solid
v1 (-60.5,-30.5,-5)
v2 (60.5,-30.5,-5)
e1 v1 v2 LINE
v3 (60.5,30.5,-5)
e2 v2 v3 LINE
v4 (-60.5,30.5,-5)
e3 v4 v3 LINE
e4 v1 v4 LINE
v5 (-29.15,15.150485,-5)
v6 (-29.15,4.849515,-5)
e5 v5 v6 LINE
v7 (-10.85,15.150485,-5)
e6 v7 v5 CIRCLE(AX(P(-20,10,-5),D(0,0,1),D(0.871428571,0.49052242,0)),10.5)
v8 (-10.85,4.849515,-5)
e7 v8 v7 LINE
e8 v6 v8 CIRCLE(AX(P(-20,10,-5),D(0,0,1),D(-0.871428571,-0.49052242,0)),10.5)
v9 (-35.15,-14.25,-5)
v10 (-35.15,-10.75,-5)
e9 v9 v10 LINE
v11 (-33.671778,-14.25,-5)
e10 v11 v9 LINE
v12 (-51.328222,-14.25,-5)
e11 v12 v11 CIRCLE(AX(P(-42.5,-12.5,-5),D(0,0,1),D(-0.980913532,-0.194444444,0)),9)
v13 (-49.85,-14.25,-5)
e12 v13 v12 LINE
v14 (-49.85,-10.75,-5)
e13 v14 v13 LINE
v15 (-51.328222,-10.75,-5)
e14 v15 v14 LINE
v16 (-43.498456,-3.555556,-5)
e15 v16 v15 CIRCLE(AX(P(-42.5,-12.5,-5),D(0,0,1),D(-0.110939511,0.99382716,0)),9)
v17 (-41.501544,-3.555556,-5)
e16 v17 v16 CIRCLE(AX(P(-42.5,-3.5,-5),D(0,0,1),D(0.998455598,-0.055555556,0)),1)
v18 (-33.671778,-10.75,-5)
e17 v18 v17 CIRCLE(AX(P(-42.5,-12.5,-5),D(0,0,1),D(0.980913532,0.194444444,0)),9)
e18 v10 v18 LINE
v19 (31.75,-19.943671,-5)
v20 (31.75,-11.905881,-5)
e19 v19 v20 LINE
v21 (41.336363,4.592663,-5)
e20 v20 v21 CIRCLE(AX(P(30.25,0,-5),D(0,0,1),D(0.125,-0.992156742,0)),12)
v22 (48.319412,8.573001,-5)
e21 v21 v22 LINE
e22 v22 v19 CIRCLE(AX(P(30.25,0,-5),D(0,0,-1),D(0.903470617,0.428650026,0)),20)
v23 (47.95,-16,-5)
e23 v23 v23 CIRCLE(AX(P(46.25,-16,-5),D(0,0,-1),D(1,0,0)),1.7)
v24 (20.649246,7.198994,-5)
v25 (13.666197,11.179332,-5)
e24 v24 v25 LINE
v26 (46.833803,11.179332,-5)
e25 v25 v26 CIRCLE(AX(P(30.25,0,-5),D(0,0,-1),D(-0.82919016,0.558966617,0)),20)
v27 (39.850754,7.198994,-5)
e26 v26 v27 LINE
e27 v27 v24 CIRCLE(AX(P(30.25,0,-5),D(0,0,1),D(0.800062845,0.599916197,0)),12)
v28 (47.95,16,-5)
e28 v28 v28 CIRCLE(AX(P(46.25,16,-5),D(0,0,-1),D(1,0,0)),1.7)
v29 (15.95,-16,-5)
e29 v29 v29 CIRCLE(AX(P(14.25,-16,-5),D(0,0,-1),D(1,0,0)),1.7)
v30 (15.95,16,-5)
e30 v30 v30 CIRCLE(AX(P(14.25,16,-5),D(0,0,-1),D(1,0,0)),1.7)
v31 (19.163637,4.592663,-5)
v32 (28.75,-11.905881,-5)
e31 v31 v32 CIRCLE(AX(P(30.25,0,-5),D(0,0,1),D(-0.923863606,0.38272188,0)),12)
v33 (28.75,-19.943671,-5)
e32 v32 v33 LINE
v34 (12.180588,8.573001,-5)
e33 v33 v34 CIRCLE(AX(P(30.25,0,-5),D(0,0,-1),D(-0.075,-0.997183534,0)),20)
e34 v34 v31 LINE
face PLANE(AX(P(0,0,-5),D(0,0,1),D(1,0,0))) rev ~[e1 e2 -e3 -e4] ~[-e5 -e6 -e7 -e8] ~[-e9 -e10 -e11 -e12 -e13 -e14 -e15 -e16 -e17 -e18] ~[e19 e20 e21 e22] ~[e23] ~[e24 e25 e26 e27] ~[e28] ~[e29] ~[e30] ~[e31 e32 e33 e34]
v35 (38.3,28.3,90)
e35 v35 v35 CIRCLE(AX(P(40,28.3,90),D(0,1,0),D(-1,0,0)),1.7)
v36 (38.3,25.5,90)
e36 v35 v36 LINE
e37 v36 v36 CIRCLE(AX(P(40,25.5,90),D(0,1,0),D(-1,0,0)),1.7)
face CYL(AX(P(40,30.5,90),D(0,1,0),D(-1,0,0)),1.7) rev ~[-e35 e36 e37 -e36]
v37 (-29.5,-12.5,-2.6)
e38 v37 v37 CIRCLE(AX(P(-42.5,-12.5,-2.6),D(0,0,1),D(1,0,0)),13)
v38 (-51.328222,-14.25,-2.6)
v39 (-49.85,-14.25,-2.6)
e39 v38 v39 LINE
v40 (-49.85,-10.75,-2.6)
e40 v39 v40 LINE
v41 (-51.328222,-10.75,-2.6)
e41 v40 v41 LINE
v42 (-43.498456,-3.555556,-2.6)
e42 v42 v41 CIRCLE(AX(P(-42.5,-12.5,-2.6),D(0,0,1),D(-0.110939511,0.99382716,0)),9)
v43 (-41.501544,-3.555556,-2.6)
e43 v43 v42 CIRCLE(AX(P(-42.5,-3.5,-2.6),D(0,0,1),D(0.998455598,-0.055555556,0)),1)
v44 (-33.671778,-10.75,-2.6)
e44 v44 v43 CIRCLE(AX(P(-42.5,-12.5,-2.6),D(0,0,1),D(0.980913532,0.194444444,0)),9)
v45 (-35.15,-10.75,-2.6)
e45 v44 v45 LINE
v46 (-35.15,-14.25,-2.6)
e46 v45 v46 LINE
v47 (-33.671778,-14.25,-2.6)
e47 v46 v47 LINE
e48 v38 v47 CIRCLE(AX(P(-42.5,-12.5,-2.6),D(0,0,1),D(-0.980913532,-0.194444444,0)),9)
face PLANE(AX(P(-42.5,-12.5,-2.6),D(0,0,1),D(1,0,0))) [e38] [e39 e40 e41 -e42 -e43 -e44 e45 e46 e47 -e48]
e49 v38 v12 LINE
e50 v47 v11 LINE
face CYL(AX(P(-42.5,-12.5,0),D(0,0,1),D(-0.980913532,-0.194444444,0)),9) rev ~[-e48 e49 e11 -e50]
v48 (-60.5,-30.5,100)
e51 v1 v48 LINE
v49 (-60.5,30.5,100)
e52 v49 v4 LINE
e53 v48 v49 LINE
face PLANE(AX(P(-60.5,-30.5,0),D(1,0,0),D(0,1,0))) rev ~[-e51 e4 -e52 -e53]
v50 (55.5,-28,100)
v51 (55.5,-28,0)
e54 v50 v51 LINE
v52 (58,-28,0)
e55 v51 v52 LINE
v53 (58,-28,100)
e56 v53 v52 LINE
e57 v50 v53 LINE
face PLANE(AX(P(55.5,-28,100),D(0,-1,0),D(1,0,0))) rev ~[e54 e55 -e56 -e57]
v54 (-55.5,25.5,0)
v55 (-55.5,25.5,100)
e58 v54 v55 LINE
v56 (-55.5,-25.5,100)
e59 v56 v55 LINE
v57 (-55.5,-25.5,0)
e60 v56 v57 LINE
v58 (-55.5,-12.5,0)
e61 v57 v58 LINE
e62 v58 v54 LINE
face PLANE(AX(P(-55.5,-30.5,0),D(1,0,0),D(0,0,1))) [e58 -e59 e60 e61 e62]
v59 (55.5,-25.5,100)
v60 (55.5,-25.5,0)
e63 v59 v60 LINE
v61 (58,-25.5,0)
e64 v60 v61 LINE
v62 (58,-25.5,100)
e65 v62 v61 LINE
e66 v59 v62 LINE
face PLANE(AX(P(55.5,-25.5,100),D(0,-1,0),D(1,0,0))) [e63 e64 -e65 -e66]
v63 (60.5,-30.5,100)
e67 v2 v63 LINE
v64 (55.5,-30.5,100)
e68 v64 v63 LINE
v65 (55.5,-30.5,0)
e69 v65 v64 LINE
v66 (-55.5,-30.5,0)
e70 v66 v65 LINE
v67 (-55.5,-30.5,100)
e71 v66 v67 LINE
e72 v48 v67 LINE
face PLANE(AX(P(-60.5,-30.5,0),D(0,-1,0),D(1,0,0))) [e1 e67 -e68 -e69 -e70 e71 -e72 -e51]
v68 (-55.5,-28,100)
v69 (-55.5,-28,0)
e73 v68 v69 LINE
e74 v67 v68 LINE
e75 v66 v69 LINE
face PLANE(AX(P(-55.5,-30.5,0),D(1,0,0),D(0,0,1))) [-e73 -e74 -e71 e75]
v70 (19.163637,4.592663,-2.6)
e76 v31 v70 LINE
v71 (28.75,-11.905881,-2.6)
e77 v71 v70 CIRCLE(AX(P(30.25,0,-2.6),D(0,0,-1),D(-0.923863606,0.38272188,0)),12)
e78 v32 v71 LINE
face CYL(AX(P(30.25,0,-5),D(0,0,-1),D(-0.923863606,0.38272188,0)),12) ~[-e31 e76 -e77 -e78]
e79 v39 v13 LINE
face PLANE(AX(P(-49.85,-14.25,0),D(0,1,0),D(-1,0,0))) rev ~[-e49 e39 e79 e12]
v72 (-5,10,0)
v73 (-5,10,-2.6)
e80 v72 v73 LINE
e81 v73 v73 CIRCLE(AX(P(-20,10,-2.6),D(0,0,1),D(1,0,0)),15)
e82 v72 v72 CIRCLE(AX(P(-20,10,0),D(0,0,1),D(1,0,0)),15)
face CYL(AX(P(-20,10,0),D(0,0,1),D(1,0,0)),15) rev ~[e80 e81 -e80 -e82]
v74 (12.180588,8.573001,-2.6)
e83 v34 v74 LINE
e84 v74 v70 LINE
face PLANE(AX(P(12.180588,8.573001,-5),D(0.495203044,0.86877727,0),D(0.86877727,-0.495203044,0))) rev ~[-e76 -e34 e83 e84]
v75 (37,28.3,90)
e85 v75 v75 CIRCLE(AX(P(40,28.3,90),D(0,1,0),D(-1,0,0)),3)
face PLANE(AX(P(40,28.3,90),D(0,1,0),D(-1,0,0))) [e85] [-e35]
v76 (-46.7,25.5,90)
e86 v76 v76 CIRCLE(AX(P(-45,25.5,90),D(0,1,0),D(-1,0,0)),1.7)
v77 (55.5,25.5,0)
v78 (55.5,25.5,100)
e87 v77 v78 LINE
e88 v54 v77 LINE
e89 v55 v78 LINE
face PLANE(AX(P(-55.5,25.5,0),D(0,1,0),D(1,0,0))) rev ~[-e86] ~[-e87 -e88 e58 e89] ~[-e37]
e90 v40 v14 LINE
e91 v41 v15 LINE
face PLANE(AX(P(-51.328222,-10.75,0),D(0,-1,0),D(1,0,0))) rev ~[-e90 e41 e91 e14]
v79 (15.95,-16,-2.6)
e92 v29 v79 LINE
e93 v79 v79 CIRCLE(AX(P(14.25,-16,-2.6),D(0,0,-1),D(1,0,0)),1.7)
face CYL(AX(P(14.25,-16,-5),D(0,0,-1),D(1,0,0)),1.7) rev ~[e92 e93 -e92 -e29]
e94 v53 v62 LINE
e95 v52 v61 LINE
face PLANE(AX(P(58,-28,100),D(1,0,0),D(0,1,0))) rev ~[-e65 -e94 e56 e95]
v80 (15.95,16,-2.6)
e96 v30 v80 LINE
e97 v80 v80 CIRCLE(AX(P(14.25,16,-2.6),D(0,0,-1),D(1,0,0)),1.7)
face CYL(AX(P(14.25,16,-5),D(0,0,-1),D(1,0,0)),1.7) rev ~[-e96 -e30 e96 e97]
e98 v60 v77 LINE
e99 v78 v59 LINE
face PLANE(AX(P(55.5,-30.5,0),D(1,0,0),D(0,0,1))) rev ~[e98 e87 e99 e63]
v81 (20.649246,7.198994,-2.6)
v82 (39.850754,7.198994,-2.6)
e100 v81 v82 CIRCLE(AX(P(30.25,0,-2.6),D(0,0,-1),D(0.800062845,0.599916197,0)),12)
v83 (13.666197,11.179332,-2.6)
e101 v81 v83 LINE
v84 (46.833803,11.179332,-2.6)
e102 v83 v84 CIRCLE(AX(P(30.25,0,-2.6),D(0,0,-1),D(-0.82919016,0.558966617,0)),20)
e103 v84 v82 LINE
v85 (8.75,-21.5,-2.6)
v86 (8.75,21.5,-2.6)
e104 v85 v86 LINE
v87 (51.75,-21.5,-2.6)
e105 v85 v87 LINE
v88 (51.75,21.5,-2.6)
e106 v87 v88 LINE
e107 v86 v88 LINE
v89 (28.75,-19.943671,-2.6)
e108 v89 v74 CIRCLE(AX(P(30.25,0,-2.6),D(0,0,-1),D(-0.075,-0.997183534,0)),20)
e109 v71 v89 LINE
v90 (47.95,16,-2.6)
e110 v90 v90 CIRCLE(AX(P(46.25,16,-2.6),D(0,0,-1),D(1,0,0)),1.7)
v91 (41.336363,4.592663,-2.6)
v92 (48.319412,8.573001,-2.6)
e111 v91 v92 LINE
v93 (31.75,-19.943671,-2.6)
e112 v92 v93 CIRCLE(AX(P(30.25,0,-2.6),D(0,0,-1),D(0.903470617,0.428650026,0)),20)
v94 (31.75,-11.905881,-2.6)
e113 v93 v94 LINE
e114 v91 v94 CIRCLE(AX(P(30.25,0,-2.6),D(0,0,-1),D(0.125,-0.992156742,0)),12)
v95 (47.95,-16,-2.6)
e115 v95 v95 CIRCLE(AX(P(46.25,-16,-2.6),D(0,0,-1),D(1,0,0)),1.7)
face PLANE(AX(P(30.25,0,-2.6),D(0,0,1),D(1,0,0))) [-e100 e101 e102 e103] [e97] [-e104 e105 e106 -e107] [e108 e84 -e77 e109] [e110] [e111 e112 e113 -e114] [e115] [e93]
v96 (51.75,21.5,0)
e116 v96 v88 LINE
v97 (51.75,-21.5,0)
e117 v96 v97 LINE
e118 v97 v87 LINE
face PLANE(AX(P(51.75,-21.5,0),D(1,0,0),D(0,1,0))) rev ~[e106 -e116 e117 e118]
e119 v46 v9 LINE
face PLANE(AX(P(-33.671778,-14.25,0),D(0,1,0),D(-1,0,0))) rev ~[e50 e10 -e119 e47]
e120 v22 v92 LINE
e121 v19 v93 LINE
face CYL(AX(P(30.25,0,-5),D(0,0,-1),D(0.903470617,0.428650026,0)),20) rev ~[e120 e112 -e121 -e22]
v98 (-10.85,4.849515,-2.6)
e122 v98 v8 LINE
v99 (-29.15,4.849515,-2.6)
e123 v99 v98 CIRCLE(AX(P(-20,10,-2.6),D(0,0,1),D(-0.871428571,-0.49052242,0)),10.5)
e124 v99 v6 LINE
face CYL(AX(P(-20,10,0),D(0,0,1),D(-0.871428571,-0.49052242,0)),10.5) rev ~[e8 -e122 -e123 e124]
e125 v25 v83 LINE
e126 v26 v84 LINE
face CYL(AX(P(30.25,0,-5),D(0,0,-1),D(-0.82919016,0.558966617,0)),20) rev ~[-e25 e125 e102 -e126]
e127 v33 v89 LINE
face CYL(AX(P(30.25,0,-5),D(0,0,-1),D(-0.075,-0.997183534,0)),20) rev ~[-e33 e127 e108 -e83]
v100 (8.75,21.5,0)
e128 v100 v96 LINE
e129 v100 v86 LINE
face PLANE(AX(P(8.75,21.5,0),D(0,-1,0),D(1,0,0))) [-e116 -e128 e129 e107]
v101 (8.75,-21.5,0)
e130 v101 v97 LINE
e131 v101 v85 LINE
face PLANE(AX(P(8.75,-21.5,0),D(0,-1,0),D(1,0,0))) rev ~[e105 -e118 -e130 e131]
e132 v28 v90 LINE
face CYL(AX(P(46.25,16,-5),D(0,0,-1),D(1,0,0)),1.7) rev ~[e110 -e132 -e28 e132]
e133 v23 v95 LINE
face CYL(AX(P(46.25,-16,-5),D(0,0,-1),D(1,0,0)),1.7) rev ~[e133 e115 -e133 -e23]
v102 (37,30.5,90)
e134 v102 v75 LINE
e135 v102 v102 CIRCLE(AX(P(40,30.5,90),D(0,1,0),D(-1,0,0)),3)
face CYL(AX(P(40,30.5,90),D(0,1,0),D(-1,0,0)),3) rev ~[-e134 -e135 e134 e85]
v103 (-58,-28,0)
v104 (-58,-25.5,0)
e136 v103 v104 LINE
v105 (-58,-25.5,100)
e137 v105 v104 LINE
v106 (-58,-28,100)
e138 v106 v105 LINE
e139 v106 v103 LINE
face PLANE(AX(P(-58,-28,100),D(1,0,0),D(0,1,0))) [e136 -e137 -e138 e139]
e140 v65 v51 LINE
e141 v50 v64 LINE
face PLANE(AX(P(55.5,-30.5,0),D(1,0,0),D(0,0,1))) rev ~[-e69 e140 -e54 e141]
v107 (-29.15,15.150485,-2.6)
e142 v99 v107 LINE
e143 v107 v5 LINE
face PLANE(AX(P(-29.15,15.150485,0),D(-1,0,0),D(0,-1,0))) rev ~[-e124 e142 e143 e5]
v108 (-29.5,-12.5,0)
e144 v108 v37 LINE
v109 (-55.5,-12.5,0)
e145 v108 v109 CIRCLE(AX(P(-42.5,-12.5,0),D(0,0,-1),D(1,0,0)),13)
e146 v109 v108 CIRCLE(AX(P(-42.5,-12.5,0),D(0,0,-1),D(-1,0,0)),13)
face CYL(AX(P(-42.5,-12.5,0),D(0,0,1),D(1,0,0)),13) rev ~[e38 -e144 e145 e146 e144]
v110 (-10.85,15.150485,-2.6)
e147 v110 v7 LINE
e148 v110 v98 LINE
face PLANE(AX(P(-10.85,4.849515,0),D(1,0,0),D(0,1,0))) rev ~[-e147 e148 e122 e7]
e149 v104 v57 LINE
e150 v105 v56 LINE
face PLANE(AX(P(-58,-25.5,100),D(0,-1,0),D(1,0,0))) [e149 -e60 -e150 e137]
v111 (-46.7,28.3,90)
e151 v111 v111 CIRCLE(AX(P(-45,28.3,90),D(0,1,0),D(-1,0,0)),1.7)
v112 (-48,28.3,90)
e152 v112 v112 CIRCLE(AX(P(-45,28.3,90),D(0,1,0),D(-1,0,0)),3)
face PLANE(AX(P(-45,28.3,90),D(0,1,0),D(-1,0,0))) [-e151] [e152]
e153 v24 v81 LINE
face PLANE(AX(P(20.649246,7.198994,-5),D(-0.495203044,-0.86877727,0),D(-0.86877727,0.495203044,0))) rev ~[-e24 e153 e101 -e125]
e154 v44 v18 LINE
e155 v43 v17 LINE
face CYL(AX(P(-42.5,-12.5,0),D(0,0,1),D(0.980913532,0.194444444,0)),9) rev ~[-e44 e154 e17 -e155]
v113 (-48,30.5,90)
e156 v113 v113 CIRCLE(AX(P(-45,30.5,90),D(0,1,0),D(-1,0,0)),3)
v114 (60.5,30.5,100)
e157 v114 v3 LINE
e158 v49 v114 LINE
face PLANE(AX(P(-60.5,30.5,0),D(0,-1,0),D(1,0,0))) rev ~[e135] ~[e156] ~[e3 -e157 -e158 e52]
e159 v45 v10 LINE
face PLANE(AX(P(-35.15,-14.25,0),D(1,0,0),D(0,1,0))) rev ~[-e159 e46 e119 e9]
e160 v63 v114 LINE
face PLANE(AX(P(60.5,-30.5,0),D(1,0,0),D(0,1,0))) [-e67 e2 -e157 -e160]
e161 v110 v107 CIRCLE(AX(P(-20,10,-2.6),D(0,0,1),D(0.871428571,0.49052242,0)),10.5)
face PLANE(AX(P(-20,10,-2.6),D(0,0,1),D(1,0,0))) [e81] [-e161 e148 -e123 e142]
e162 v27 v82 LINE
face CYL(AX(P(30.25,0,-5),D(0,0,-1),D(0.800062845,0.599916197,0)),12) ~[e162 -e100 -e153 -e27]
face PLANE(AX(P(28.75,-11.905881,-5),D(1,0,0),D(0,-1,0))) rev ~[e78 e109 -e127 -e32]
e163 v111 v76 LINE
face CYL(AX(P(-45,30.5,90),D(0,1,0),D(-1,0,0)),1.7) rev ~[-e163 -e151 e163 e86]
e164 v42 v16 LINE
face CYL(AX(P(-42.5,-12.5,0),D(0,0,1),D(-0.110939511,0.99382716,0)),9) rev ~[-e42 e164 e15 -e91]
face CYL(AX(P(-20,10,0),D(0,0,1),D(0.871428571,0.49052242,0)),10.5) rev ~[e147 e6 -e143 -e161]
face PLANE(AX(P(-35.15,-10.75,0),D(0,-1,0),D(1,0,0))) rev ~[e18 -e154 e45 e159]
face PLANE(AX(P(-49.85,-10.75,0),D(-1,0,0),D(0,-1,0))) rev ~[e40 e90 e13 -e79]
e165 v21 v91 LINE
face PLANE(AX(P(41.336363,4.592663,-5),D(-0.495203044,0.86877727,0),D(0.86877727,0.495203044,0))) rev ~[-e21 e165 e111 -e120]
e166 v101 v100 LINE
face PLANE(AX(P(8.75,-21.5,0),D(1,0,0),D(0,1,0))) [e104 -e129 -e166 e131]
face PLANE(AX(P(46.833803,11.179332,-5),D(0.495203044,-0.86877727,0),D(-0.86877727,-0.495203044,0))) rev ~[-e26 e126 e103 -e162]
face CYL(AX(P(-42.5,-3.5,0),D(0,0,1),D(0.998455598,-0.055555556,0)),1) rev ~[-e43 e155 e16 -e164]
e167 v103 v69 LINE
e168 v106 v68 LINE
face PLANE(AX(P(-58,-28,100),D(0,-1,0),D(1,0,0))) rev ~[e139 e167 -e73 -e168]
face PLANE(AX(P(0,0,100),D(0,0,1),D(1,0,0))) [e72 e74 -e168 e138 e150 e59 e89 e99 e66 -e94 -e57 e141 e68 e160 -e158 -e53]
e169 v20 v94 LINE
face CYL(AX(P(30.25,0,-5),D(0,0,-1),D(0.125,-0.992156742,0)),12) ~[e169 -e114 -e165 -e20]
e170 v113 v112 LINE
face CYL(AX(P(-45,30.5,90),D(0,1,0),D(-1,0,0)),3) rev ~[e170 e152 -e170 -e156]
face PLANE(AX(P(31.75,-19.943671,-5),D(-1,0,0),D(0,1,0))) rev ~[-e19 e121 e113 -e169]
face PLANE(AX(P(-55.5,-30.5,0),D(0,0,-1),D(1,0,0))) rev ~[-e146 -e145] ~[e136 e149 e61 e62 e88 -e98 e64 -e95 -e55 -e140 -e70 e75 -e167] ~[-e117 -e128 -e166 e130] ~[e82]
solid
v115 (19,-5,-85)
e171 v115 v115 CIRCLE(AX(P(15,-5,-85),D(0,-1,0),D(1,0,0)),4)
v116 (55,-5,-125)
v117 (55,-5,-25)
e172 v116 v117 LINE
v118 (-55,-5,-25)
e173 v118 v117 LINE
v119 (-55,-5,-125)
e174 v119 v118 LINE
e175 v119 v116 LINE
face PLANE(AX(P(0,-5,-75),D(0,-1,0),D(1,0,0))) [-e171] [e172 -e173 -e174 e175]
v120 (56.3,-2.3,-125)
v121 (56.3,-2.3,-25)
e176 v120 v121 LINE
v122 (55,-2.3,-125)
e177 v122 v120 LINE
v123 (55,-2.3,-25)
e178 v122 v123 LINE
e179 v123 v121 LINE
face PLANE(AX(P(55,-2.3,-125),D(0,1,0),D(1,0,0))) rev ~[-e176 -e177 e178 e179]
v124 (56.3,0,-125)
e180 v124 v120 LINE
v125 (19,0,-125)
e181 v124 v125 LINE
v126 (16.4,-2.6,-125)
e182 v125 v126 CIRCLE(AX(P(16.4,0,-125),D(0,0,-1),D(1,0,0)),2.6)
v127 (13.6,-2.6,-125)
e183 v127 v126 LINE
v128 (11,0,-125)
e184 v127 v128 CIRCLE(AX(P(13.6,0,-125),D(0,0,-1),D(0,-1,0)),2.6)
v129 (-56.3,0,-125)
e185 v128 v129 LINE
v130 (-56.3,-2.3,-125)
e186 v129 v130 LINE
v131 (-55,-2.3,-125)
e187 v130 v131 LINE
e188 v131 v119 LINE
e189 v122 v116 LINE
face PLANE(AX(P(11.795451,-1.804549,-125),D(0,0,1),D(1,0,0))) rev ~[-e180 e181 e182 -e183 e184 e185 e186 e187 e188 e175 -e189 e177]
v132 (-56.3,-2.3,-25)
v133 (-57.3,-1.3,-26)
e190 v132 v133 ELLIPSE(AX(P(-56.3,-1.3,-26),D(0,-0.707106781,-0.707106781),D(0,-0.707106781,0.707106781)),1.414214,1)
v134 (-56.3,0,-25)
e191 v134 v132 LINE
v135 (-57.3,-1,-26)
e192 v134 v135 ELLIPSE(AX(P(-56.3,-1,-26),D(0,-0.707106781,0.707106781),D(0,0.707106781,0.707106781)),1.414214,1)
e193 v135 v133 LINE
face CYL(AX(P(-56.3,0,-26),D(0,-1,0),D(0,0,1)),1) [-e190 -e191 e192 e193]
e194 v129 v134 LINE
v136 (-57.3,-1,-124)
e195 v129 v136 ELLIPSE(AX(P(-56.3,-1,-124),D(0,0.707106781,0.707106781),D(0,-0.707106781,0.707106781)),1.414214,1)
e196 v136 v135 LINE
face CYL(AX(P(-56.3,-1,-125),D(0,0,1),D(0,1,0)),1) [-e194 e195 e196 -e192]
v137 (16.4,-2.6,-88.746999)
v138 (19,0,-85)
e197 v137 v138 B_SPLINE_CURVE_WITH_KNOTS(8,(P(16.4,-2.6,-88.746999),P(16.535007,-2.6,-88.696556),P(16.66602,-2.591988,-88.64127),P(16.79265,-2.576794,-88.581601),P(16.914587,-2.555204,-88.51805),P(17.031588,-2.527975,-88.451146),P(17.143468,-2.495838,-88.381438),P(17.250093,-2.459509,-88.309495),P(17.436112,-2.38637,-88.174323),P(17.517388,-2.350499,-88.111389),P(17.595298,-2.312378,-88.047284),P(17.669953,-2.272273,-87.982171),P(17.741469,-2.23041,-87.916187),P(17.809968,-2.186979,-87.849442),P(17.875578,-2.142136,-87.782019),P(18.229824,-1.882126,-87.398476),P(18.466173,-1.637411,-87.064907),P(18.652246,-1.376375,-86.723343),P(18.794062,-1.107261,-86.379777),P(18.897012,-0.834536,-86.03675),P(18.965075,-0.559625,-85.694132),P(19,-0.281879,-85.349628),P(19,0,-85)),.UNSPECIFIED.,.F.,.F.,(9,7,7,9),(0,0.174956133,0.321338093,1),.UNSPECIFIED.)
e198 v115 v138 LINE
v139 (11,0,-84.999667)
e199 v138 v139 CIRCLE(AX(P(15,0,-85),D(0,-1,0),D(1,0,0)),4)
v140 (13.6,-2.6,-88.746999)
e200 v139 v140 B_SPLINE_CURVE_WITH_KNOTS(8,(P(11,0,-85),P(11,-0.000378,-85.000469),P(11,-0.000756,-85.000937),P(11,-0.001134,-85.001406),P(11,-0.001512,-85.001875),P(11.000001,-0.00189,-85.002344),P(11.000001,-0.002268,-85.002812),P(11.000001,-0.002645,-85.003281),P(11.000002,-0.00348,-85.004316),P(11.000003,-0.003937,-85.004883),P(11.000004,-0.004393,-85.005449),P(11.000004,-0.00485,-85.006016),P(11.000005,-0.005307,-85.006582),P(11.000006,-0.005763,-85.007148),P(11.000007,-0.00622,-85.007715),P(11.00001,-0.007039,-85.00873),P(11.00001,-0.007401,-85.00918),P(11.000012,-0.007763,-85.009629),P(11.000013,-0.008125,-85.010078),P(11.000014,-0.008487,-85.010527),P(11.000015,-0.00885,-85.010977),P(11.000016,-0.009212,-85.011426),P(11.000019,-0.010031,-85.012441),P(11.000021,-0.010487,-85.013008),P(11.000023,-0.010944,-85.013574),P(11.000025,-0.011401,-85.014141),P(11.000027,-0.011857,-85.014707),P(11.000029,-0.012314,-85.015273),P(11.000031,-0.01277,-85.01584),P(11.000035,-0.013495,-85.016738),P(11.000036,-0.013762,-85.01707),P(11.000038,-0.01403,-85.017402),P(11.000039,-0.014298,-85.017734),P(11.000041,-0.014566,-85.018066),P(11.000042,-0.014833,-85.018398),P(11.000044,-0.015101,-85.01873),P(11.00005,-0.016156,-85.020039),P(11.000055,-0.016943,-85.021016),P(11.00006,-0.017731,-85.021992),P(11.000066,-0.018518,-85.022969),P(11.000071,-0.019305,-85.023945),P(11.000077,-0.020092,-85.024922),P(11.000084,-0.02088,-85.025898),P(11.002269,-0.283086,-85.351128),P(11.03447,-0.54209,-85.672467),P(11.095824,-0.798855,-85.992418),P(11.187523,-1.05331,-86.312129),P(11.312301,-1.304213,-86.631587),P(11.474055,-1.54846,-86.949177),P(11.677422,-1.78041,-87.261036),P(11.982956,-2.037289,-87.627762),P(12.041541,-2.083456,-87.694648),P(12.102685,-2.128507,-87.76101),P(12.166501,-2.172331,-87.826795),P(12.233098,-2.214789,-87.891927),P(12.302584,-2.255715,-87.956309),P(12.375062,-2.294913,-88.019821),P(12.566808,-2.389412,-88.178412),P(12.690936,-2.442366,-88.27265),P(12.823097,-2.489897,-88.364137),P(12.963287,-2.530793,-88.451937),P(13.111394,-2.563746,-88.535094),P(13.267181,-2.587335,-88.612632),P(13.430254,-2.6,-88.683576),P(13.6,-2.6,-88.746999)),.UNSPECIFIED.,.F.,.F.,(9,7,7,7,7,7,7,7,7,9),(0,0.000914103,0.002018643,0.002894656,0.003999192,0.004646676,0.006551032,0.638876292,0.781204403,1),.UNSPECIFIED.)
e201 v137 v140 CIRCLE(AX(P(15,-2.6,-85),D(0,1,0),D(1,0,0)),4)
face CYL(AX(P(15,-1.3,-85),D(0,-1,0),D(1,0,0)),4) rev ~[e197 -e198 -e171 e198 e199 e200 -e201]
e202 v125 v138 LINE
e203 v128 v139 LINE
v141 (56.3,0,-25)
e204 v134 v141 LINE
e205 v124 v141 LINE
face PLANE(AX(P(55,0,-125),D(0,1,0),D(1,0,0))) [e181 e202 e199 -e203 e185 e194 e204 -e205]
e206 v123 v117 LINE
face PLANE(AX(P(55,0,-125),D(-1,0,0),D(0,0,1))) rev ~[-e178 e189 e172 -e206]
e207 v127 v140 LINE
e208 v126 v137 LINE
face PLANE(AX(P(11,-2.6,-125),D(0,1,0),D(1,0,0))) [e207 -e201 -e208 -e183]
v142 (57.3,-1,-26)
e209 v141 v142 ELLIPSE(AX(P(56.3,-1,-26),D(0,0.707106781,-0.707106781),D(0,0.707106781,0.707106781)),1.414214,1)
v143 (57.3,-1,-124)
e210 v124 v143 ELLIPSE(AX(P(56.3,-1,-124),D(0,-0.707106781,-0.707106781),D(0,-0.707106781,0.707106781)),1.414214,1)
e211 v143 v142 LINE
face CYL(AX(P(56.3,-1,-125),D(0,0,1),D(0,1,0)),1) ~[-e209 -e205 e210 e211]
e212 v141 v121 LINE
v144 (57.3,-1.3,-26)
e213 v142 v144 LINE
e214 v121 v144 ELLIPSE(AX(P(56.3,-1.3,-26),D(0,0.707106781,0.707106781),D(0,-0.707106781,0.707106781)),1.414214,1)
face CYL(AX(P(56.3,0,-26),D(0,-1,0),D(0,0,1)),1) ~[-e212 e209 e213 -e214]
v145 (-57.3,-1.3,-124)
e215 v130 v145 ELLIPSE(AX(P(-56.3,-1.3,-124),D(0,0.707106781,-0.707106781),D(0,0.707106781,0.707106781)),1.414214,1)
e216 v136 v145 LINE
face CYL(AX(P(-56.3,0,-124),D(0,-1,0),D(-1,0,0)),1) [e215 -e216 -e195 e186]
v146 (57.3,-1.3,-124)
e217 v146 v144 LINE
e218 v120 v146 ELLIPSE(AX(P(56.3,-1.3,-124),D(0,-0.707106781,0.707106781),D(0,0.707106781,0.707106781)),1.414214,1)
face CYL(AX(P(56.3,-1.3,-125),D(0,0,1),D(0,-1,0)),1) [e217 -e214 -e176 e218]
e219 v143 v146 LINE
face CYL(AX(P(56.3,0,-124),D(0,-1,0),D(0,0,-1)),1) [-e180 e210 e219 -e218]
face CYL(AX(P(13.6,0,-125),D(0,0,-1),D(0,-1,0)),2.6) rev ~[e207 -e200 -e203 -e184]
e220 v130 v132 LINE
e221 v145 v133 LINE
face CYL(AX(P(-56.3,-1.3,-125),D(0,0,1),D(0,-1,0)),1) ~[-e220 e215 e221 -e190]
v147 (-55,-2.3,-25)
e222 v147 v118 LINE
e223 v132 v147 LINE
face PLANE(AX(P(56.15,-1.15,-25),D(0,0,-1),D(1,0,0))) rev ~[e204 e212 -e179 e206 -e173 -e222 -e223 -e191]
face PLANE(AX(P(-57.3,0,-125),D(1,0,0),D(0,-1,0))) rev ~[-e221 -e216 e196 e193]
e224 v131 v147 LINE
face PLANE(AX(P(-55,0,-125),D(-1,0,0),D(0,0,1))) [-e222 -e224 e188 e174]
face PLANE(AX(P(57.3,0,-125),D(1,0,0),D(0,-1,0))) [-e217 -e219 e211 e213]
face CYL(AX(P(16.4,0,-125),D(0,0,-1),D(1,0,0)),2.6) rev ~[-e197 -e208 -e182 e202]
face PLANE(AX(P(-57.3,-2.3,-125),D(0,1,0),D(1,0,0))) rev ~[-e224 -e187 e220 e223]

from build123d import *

# Parameters (mm, degrees)
F0_W          = 121
F0_H          = 61
F0_W_2        = 111
F0_H_2        = 51
F1_DEPTH      = 100
F2_W          = 121
F2_H          = 61
F3_DEPTH      = 5
F5_DEPTH      = 25
F7_R          = 1.7
F8_DEPTH      = 25
F10_R         = 1.7
F11_DEPTH     = 25
F12_R         = 3
F13_DEPTH     = 2.2
F14_R         = 15
F14_R_2       = 13
F14_W         = 43
F14_H         = 43
F15_DEPTH     = 2.6
F17_W         = 111
F17_H         = 100
F18_DEPTH     = 25
F20_W         = 2.5
F20_H         = 2.5
F21_DEPTH     = 100
F22_W         = 110
F22_H         = 100
F22_R         = 4
F23_DEPTH     = 5
F24_W         = 2.3
F24_H         = 2.3
F25_DEPTH     = 100
F26_R         = 1
F28_W         = 8
F28_H         = 2.6
F29_DEPTH     = 40.001
F30_T4_DEPTH  = 46.5
F30_S5_R      = 4
F30_T6_DEPTH  = 25
F30_T10_DEPTH = 46.501
F30_S11_R     = 4
F30_T12_DEPTH = 25


# Not quite as in the source:
# - a fillet or chamfer that OpenCascade refuses, or shapes differently, is made with other operations: its cross-section is extruded or revolved along the edge and cut away or added


with BuildPart() as f1:
    # F0 (on Top) → F1 (new body)
    with BuildSketch(Plane.XY):
        Rectangle(F0_W, F0_H)
        Rectangle(F0_W_2, F0_H_2, mode=Mode.SUBTRACT)
    extrude(amount=F1_DEPTH)

    # F2 (on Top) → F3 (join)
    with BuildSketch(Plane.XY):
        Rectangle(F2_W, F2_H)
    extrude(amount=-F3_DEPTH)

    # F4 (on Top) → F5 (cut)
    with BuildSketch(Plane.XY):
        with BuildLine():
            Line((-35.15, -10.75), (-33.6717782085, -10.75))
            ThreePointArc((-33.6717782085, -10.75), (-36.410590764, -5.8728516572), (-41.5015444025, -3.5555555556))
            ThreePointArc((-41.5015444025, -3.5555555556), (-42.5, -2.5), (-43.4984555975, -3.5555555556))
            ThreePointArc((-43.4984555975, -3.5555555556), (-48.589409236, -5.8728516572), (-51.3282217915, -10.75))
            Line((-51.3282217915, -10.75), (-49.85, -10.75))
            Line((-49.85, -10.75), (-49.85, -14.25))
            Line((-49.85, -14.25), (-51.3282217915, -14.25))
            ThreePointArc((-51.3282217915, -14.25), (-42.5, -21.5), (-33.6717782085, -14.25))
            Line((-33.6717782085, -14.25), (-35.15, -14.25))
            Line((-35.15, -14.25), (-35.15, -10.75))
        make_face()
        with BuildLine():
            Line((-29.15, 15.150485414), (-29.15, 4.849514586))
            ThreePointArc((-29.15, 4.849514586), (-20, -0.5), (-10.85, 4.849514586))
            Line((-10.85, 4.849514586), (-10.85, 15.150485414))
            ThreePointArc((-10.85, 15.150485414), (-20, 20.5), (-29.15, 15.150485414))
        make_face()
    extrude(amount=-F5_DEPTH, mode=Mode.SUBTRACT)

    # F7 (on offset) → F8 (cut)
    with BuildSketch(Plane(origin=(0, 30.5, 0), x_dir=(-1, 0, 0), z_dir=(0, 1, 0))):
        with Locations((-40, 90)):
            Circle(F7_R)
        with Locations((45, 90)):
            Circle(F7_R)
    extrude(amount=-F8_DEPTH, mode=Mode.SUBTRACT)

    # F10 (on offset) → F11 (cut)
    with BuildSketch(Plane(origin=(0, 0, -5), x_dir=(1, 0, 0), z_dir=(0, 0, -1))):
        with Locations((14.25, 16)):
            Circle(F10_R)
        with BuildLine():
            Line((28.75, 11.9058808998), (28.75, 19.9436706752))
            ThreePointArc((28.75, 19.9436706752), (12.9572093402, 10.0478550546), (12.1805876672, -8.5730005218))
            Line((12.1805876672, -8.5730005218), (19.1636367266, -4.5926625579))
            ThreePointArc((19.1636367266, -4.5926625579), (19.8743256041, 6.0287130328), (28.75, 11.9058808998))
        make_face()
        with BuildLine():
            Line((31.75, 19.9436706752), (31.75, 11.9058808998))
            ThreePointArc((31.75, 11.9058808998), (40.6256743959, 6.0287130328), (41.3363632734, -4.5926625579))
            Line((41.3363632734, -4.5926625579), (48.3194123328, -8.5730005218))
            ThreePointArc((48.3194123328, -8.5730005218), (47.5427906598, 10.0478550546), (31.75, 19.9436706752))
        make_face()
        with Locations((46.25, 16)):
            Circle(F10_R)
        with BuildLine():
            Line((46.8338032008, -11.1793323324), (39.8507541413, -7.1989943685))
            ThreePointArc((39.8507541413, -7.1989943685), (30.25, -12), (20.6492458587, -7.1989943685))
            Line((20.6492458587, -7.1989943685), (13.6661967992, -11.1793323324))
            ThreePointArc((13.6661967992, -11.1793323324), (30.25, -20), (46.8338032008, -11.1793323324))
        make_face()
        with Locations((14.25, -16)):
            Circle(F10_R)
        with Locations((46.25, -16)):
            Circle(F10_R)
    extrude(amount=-F11_DEPTH, mode=Mode.SUBTRACT)

    # F12 (on offset) → F13 (cut)
    with BuildSketch(Plane(origin=(0, 30.5, 0), x_dir=(-1, 0, 0), z_dir=(0, 1, 0))):
        with Locations((-40, 90)):
            Circle(F12_R)
        with Locations((45, 90)):
            Circle(F12_R)
    extrude(amount=-F13_DEPTH, mode=Mode.SUBTRACT)

    # F14 (on Top) → F15 (cut)
    with BuildSketch(Plane.XY):
        with Locations((-20, 10)):
            Circle(F14_R)
        with Locations((-42.5, -12.5)):
            Circle(F14_R_2)
        with Locations((30.25, 0)):
            Rectangle(F14_W, F14_H)
    extrude(amount=-F15_DEPTH, mode=Mode.SUBTRACT)

    # F17 (on offset) → F18 (cut)
    with BuildSketch(Plane.XZ.offset(30.5)):
        with Locations((0, 50)):
            Rectangle(F17_W, F17_H)
    extrude(amount=-F18_DEPTH, mode=Mode.SUBTRACT)

    # F20 (on offset) → F21 (cut)
    with BuildSketch(Plane.XY.offset(100)):
        with Locations((-56.75, -26.75)):
            Rectangle(F20_W, F20_H)
        with Locations((56.75, -26.75)):
            Rectangle(F20_W, F20_H)
    extrude(amount=-F21_DEPTH, mode=Mode.SUBTRACT)


with BuildPart() as f23:
    # F22 (on Front) → F23 (new body)
    with BuildSketch(Plane.XZ):
        with Locations((0, -75)):
            Rectangle(F22_W, F22_H)
        with Locations((15, -85)):
            Circle(F22_R, mode=Mode.SUBTRACT)
    extrude(amount=F23_DEPTH)

    # F24 (on face) → F25 (join)
    with BuildSketch(Plane(origin=(0, 0, -125), x_dir=(1, 0, 0), z_dir=(0, 0, -1))):
        with Locations((56.15, 1.15)):
            Rectangle(F24_W, F24_H)
        with Locations((-56.15, 1.15)):
            Rectangle(F24_W, F24_H)
    extrude(amount=-F25_DEPTH)

    # F26
    f26_edges = [f23.edges().sort_by_distance(p)[0] for p in [
        (57.3, 0, -75),
        (57.3, -2.3, -75),
        (57.3, -1.15, -125),
        (57.3, -1.15, -25),
        (-57.3, -2.3, -75),
        (-57.3, 0, -75),
        (-57.3, -1.15, -125),
        (-57.3, -1.15, -25),
    ]]
    fillet(f26_edges, radius=F26_R)

    # F28 (on offset) → F29 (cut, through all)
    with BuildSketch(Plane(origin=(0, 0, -125), x_dir=(1, 0, 0), z_dir=(0, 0, -1))):
        with Locations((15, 1.3)):
            Rectangle(F28_W, F28_H)
    extrude(amount=-F29_DEPTH, mode=Mode.SUBTRACT)

    # F30: fillet of radius 2.6 on 2 edges, made by hand


with BuildPart() as f30_tool2:
    # F30_s3 → F30_t4 (new body)
    with BuildSketch(Plane.XY.offset(-125)):
        with BuildLine():
            ThreePointArc((19, 0), (18.2384776311, -1.8384776311), (16.4, -2.6))
            Line((16.4, -2.6), (19, -2.6))
            Line((19, -2.6), (19, 0))
        make_face()
    extrude(amount=F30_T4_DEPTH)

    # F30_s5 → F30_t6 (cut, symmetric)
    with BuildSketch(Plane.XZ.offset(1.3)):
        with Locations((15, -85)):
            Circle(F30_S5_R)
    extrude(amount=F30_T6_DEPTH, both=True, mode=Mode.SUBTRACT)


with BuildPart() as f23_1:
    add(f23.part)

    # F30_t1: union F30_tool2
    add(f30_tool2.part)


with BuildPart() as f30_tool8:
    # F30_s9 → F30_t10 (new body)
    with BuildSketch(Plane.XY.offset(-125)):
        with BuildLine():
            ThreePointArc((13.6, -2.6), (11.7615223689, -1.8384776311), (11, 0))
            Line((11, 0), (11, -2.6))
            Line((11, -2.6), (13.6, -2.6))
        make_face()
    extrude(amount=F30_T10_DEPTH)

    # F30_s11 → F30_t12 (cut, symmetric)
    with BuildSketch(Plane.XZ.offset(1.3)):
        with Locations((15, -85)):
            Circle(F30_S11_R)
    extrude(amount=F30_T12_DEPTH, both=True, mode=Mode.SUBTRACT)


with BuildPart() as f23_2:
    add(f23_1.part)

    # F30_t7: union F30_tool8
    add(f30_tool8.part)


solid = Compound([f1.part, f23_2.part])
